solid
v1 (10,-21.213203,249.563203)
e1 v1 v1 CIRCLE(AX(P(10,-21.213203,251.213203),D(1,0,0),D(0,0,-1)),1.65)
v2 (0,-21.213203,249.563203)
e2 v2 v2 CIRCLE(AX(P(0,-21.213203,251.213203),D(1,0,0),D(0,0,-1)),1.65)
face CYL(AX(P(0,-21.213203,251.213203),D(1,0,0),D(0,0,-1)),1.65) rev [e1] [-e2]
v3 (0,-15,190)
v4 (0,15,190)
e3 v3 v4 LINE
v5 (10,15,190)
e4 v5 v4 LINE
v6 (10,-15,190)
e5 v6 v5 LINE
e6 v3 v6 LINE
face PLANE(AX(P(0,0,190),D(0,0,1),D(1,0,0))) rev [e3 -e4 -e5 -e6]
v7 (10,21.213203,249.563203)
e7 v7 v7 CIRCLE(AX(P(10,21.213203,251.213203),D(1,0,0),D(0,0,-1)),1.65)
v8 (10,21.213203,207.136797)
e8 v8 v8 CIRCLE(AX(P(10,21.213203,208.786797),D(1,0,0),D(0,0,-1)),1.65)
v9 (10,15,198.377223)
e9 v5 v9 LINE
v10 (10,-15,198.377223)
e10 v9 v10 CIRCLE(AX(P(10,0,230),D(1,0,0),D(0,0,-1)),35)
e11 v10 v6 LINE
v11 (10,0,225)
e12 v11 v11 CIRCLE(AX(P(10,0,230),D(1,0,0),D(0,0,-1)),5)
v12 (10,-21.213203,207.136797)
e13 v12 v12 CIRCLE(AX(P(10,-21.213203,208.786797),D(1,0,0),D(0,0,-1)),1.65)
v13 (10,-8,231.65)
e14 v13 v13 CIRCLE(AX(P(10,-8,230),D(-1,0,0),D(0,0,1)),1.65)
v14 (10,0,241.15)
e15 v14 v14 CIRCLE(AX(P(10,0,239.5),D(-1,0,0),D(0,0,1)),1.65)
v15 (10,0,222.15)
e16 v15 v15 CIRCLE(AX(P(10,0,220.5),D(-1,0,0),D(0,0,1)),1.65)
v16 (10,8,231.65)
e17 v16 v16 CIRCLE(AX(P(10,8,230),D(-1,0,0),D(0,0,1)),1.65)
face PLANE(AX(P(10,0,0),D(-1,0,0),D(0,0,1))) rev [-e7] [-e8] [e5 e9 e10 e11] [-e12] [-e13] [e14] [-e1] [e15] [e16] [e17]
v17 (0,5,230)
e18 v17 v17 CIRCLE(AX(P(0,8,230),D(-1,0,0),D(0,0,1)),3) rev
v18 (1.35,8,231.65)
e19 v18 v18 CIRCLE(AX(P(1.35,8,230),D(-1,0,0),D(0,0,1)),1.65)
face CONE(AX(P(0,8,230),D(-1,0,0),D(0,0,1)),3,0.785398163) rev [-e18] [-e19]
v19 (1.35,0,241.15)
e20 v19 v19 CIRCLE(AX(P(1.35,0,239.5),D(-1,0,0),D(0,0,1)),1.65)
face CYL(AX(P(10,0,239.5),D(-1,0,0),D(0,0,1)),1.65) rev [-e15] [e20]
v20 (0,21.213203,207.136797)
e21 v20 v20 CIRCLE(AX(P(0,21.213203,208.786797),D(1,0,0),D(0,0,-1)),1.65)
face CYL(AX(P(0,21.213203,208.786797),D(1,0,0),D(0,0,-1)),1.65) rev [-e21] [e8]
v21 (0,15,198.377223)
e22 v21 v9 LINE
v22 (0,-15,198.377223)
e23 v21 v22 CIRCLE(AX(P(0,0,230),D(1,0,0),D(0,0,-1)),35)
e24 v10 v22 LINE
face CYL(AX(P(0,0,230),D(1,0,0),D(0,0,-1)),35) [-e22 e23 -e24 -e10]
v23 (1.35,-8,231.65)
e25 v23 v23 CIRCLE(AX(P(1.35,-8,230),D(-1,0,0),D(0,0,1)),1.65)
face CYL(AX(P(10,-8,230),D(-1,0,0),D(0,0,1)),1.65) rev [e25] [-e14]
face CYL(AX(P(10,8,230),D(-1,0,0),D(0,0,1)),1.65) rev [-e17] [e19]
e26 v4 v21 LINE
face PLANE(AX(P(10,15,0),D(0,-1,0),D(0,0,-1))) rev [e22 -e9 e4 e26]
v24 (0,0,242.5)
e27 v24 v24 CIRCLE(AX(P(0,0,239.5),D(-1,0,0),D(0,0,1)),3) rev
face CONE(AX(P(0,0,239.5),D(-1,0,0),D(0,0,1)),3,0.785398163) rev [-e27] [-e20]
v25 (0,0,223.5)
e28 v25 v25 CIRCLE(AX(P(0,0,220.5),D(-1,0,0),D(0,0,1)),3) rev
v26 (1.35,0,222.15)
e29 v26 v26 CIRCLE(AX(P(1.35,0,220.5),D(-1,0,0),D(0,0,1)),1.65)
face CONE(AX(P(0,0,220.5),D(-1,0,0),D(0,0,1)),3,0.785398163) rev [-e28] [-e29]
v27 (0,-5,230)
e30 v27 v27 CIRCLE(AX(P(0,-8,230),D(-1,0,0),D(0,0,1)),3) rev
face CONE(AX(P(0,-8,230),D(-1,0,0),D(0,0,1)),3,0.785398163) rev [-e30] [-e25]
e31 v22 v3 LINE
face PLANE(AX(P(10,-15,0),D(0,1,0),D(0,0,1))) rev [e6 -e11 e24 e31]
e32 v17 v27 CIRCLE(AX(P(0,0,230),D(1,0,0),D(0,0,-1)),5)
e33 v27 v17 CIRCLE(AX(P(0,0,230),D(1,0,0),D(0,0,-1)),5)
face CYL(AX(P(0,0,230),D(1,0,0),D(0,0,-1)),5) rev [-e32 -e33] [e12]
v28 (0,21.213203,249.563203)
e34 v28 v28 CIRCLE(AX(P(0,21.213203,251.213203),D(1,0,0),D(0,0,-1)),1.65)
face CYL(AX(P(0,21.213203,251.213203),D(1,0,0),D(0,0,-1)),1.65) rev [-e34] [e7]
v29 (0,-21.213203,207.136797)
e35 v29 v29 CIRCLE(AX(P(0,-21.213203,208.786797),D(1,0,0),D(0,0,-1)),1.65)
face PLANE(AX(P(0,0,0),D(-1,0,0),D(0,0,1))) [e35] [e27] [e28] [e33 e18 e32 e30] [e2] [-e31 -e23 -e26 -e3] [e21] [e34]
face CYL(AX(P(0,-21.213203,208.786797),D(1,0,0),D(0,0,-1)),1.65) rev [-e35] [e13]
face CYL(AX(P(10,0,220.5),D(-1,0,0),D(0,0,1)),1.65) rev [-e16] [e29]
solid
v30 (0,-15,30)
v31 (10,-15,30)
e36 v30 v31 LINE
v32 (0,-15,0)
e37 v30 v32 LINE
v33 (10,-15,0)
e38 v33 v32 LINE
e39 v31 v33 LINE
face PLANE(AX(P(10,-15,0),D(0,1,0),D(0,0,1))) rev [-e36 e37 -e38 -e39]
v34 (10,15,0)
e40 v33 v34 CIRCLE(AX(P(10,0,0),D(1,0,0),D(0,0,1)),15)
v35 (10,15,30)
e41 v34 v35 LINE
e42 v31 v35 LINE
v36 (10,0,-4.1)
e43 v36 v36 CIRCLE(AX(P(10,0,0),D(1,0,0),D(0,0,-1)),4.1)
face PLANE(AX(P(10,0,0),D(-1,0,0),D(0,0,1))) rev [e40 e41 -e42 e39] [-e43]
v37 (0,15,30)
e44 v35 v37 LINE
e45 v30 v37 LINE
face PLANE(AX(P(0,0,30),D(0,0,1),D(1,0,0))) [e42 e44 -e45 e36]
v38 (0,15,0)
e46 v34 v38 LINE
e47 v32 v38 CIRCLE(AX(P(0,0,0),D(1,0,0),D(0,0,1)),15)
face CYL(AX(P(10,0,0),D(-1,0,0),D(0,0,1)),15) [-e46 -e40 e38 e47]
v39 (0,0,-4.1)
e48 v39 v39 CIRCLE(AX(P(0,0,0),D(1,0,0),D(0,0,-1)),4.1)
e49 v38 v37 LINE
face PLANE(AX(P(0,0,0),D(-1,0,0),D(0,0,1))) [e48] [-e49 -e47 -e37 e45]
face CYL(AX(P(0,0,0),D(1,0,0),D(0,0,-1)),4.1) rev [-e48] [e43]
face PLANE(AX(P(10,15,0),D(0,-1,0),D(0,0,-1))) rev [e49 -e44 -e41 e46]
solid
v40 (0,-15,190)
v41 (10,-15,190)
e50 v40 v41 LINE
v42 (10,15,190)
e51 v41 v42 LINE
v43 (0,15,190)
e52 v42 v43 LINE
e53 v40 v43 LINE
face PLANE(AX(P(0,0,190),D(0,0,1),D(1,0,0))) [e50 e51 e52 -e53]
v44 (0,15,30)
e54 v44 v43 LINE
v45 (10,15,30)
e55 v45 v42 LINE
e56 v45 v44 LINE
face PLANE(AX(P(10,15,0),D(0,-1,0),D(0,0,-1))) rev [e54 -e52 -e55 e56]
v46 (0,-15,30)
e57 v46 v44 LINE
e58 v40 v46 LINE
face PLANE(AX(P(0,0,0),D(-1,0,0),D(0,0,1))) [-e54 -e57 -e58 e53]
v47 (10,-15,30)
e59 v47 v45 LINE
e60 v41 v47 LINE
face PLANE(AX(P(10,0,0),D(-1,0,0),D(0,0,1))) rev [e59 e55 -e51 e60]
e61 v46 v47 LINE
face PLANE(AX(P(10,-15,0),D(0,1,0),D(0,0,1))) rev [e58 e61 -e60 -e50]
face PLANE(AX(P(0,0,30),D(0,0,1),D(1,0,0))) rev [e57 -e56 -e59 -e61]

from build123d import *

# Parameters (mm, degrees)
BOSS_EXTRUDE1_DEPTH = 10
SKETCH2_R           = 4.1
CUT_EXTRUDE1_DEPTH  = 246.662369931
SKETCH3_R           = 1.5
CUT_EXTRUDE2_DEPTH  = 246.662369931
SKETCH4_R           = 5
CUT_EXTRUDE3_DEPTH  = 246.662369931
BOSS_EXTRUDE2_START = -10
SKETCH5_R           = 35
SKETCH5_R_2         = 15
BOSS_EXTRUDE2_DEPTH = 10
SKETCH6_R           = 1.65
CUT_EXTRUDE4_DEPTH  = 268.488317502
CHAMFER3_SIZE       = 1.5
SKETCH7_R           = 1.65
CUT_EXTRUDE5_DEPTH  = 268.488317502
SPLIT1_OUTLINE_R    = 4.1
SPLIT1_DEPTH        = 10
SPLIT1_START        = -15
SPLIT1_2_OUTLINE_W  = 10
SPLIT1_2_OUTLINE_H  = 30
SPLIT1_2_DEPTH      = 205
SPLIT1_START_2      = 30
SPLIT1_3_OUTLINE_W  = 10
SPLIT1_3_OUTLINE_H  = 30
SPLIT1_3_DEPTH      = 160


# Read off the part's stored shape, not the designer's step: Split1
with BuildPart() as part:
    # Sketch1 → Boss-Extrude1 (new body)
    with BuildSketch(Plane.YZ):
        with BuildLine():
            Line((-15, 0), (-15, 230))
            ThreePointArc((-15, 230), (0, 245), (15, 230))
            Line((15, 230), (15, 0))
            ThreePointArc((15, 0), (0, -15), (-15, 0))
        make_face()
    extrude(amount=BOSS_EXTRUDE1_DEPTH)

    # Sketch2 → Cut-Extrude1 (cut, through all)
    with BuildSketch(Plane.YZ.offset(10)):
        with Locations(Location((0, 0, 0), (0, 0, 270))):
            Circle(SKETCH2_R)
    extrude(amount=-CUT_EXTRUDE1_DEPTH, mode=Mode.SUBTRACT)

    # Sketch3 → Cut-Extrude2 (cut, through all)
    with BuildSketch(Plane.YZ.offset(10)):
        with Locations(Location((0, 239.5, 0), (0, 0, 270))):
            Circle(SKETCH3_R)
        with Locations(Location((8, 230, 0), (0, 0, 270))):
            Circle(SKETCH3_R)
        with Locations(Location((-8, 230, 0), (0, 0, 270))):
            Circle(SKETCH3_R)
        with Locations(Location((0, 220.5, 0), (0, 0, 270))):
            Circle(SKETCH3_R)
    extrude(amount=-CUT_EXTRUDE2_DEPTH, mode=Mode.SUBTRACT)

    # Sketch4 → Cut-Extrude3 (cut, through all)
    with BuildSketch(Plane.YZ.offset(10)):
        with Locations(Location((0, 230, 0), (0, 0, 270))):
            Circle(SKETCH4_R)
    extrude(amount=-CUT_EXTRUDE3_DEPTH, mode=Mode.SUBTRACT)

    # Sketch5 → Boss-Extrude2 (add)
    with BuildSketch(Plane.YZ.offset(10).offset(BOSS_EXTRUDE2_START)):
        with Locations((0, 230)):
            Circle(SKETCH5_R)
        with Locations((0, 230)):
            Circle(SKETCH5_R_2, mode=Mode.SUBTRACT)
    extrude(amount=BOSS_EXTRUDE2_DEPTH)

    # Sketch6 → Cut-Extrude4 (cut, through all)
    with BuildSketch(Plane.YZ.offset(10)):
        with Locations(Location((-21.213203436, 251.213203436, 0), (0, 0, 270))):
            Circle(SKETCH6_R)
        with Locations(Location((21.213203436, 251.213203436, 0), (0, 0, 270))):
            Circle(SKETCH6_R)
        with Locations(Location((21.213203436, 208.786796564, 0), (0, 0, 270))):
            Circle(SKETCH6_R)
        with Locations(Location((-21.213203436, 208.786796564, 0), (0, 0, 270))):
            Circle(SKETCH6_R)
    extrude(amount=-CUT_EXTRUDE4_DEPTH, mode=Mode.SUBTRACT)

    # Chamfer3
    chamfer3_edges = [part.edges().sort_by_distance(p)[0] for p in [
        (0, 0, 241),
        (0, 8, 231.5),
        (0, -8, 231.5),
        (0, 0, 222),
    ]]
    chamfer(chamfer3_edges, length=CHAMFER3_SIZE - 0.0001)  # a hair under: the kernel refuses the full size

    # Sketch7 → Cut-Extrude5 (cut, through all)
    with BuildSketch(Plane(origin=(0, 0, 0), x_dir=(0, -1, 0), z_dir=(-1, 0, 0))):
        with Locations(Location((0, 239.5, 0), (0, 0, 90))):
            Circle(SKETCH7_R)
        with Locations(Location((8, 230, 0), (0, 0, 90))):
            Circle(SKETCH7_R)
        with Locations(Location((0, 220.5, 0), (0, 0, 90))):
            Circle(SKETCH7_R)
        with Locations(Location((-8, 230, 0), (0, 0, 90))):
            Circle(SKETCH7_R)
    extrude(amount=-CUT_EXTRUDE5_DEPTH, mode=Mode.SUBTRACT)

    # Split1 2 outline → Split1 2 (cut)
    with BuildSketch(Plane.XY.offset(SPLIT1_START)):
        with Locations((5, 0)):
            Rectangle(SPLIT1_2_OUTLINE_W, SPLIT1_2_OUTLINE_H)
    extrude(amount=SPLIT1_2_DEPTH, mode=Mode.SUBTRACT)


with BuildPart() as body_2:
    # Split1 outline → Split1 (new body)
    with BuildSketch(Plane.YZ):
        with BuildLine():
            Line((15, 0), (15, 30))
            Line((15, 30), (-15, 30))
            Line((-15, 30), (-15, 0))
            ThreePointArc((-15, 0), (0, -15), (15, 0))
        make_face()
        Circle(SPLIT1_OUTLINE_R, mode=Mode.SUBTRACT)
    extrude(amount=SPLIT1_DEPTH)


with BuildPart() as body_3:
    # Split1 3 outline → Split1 3 (new body)
    with BuildSketch(Plane.XY.offset(SPLIT1_START_2)):
        with Locations((5, 0)):
            Rectangle(SPLIT1_3_OUTLINE_W, SPLIT1_3_OUTLINE_H)
    extrude(amount=SPLIT1_3_DEPTH)


solid = Compound([part.part, body_2.part, body_3.part])
